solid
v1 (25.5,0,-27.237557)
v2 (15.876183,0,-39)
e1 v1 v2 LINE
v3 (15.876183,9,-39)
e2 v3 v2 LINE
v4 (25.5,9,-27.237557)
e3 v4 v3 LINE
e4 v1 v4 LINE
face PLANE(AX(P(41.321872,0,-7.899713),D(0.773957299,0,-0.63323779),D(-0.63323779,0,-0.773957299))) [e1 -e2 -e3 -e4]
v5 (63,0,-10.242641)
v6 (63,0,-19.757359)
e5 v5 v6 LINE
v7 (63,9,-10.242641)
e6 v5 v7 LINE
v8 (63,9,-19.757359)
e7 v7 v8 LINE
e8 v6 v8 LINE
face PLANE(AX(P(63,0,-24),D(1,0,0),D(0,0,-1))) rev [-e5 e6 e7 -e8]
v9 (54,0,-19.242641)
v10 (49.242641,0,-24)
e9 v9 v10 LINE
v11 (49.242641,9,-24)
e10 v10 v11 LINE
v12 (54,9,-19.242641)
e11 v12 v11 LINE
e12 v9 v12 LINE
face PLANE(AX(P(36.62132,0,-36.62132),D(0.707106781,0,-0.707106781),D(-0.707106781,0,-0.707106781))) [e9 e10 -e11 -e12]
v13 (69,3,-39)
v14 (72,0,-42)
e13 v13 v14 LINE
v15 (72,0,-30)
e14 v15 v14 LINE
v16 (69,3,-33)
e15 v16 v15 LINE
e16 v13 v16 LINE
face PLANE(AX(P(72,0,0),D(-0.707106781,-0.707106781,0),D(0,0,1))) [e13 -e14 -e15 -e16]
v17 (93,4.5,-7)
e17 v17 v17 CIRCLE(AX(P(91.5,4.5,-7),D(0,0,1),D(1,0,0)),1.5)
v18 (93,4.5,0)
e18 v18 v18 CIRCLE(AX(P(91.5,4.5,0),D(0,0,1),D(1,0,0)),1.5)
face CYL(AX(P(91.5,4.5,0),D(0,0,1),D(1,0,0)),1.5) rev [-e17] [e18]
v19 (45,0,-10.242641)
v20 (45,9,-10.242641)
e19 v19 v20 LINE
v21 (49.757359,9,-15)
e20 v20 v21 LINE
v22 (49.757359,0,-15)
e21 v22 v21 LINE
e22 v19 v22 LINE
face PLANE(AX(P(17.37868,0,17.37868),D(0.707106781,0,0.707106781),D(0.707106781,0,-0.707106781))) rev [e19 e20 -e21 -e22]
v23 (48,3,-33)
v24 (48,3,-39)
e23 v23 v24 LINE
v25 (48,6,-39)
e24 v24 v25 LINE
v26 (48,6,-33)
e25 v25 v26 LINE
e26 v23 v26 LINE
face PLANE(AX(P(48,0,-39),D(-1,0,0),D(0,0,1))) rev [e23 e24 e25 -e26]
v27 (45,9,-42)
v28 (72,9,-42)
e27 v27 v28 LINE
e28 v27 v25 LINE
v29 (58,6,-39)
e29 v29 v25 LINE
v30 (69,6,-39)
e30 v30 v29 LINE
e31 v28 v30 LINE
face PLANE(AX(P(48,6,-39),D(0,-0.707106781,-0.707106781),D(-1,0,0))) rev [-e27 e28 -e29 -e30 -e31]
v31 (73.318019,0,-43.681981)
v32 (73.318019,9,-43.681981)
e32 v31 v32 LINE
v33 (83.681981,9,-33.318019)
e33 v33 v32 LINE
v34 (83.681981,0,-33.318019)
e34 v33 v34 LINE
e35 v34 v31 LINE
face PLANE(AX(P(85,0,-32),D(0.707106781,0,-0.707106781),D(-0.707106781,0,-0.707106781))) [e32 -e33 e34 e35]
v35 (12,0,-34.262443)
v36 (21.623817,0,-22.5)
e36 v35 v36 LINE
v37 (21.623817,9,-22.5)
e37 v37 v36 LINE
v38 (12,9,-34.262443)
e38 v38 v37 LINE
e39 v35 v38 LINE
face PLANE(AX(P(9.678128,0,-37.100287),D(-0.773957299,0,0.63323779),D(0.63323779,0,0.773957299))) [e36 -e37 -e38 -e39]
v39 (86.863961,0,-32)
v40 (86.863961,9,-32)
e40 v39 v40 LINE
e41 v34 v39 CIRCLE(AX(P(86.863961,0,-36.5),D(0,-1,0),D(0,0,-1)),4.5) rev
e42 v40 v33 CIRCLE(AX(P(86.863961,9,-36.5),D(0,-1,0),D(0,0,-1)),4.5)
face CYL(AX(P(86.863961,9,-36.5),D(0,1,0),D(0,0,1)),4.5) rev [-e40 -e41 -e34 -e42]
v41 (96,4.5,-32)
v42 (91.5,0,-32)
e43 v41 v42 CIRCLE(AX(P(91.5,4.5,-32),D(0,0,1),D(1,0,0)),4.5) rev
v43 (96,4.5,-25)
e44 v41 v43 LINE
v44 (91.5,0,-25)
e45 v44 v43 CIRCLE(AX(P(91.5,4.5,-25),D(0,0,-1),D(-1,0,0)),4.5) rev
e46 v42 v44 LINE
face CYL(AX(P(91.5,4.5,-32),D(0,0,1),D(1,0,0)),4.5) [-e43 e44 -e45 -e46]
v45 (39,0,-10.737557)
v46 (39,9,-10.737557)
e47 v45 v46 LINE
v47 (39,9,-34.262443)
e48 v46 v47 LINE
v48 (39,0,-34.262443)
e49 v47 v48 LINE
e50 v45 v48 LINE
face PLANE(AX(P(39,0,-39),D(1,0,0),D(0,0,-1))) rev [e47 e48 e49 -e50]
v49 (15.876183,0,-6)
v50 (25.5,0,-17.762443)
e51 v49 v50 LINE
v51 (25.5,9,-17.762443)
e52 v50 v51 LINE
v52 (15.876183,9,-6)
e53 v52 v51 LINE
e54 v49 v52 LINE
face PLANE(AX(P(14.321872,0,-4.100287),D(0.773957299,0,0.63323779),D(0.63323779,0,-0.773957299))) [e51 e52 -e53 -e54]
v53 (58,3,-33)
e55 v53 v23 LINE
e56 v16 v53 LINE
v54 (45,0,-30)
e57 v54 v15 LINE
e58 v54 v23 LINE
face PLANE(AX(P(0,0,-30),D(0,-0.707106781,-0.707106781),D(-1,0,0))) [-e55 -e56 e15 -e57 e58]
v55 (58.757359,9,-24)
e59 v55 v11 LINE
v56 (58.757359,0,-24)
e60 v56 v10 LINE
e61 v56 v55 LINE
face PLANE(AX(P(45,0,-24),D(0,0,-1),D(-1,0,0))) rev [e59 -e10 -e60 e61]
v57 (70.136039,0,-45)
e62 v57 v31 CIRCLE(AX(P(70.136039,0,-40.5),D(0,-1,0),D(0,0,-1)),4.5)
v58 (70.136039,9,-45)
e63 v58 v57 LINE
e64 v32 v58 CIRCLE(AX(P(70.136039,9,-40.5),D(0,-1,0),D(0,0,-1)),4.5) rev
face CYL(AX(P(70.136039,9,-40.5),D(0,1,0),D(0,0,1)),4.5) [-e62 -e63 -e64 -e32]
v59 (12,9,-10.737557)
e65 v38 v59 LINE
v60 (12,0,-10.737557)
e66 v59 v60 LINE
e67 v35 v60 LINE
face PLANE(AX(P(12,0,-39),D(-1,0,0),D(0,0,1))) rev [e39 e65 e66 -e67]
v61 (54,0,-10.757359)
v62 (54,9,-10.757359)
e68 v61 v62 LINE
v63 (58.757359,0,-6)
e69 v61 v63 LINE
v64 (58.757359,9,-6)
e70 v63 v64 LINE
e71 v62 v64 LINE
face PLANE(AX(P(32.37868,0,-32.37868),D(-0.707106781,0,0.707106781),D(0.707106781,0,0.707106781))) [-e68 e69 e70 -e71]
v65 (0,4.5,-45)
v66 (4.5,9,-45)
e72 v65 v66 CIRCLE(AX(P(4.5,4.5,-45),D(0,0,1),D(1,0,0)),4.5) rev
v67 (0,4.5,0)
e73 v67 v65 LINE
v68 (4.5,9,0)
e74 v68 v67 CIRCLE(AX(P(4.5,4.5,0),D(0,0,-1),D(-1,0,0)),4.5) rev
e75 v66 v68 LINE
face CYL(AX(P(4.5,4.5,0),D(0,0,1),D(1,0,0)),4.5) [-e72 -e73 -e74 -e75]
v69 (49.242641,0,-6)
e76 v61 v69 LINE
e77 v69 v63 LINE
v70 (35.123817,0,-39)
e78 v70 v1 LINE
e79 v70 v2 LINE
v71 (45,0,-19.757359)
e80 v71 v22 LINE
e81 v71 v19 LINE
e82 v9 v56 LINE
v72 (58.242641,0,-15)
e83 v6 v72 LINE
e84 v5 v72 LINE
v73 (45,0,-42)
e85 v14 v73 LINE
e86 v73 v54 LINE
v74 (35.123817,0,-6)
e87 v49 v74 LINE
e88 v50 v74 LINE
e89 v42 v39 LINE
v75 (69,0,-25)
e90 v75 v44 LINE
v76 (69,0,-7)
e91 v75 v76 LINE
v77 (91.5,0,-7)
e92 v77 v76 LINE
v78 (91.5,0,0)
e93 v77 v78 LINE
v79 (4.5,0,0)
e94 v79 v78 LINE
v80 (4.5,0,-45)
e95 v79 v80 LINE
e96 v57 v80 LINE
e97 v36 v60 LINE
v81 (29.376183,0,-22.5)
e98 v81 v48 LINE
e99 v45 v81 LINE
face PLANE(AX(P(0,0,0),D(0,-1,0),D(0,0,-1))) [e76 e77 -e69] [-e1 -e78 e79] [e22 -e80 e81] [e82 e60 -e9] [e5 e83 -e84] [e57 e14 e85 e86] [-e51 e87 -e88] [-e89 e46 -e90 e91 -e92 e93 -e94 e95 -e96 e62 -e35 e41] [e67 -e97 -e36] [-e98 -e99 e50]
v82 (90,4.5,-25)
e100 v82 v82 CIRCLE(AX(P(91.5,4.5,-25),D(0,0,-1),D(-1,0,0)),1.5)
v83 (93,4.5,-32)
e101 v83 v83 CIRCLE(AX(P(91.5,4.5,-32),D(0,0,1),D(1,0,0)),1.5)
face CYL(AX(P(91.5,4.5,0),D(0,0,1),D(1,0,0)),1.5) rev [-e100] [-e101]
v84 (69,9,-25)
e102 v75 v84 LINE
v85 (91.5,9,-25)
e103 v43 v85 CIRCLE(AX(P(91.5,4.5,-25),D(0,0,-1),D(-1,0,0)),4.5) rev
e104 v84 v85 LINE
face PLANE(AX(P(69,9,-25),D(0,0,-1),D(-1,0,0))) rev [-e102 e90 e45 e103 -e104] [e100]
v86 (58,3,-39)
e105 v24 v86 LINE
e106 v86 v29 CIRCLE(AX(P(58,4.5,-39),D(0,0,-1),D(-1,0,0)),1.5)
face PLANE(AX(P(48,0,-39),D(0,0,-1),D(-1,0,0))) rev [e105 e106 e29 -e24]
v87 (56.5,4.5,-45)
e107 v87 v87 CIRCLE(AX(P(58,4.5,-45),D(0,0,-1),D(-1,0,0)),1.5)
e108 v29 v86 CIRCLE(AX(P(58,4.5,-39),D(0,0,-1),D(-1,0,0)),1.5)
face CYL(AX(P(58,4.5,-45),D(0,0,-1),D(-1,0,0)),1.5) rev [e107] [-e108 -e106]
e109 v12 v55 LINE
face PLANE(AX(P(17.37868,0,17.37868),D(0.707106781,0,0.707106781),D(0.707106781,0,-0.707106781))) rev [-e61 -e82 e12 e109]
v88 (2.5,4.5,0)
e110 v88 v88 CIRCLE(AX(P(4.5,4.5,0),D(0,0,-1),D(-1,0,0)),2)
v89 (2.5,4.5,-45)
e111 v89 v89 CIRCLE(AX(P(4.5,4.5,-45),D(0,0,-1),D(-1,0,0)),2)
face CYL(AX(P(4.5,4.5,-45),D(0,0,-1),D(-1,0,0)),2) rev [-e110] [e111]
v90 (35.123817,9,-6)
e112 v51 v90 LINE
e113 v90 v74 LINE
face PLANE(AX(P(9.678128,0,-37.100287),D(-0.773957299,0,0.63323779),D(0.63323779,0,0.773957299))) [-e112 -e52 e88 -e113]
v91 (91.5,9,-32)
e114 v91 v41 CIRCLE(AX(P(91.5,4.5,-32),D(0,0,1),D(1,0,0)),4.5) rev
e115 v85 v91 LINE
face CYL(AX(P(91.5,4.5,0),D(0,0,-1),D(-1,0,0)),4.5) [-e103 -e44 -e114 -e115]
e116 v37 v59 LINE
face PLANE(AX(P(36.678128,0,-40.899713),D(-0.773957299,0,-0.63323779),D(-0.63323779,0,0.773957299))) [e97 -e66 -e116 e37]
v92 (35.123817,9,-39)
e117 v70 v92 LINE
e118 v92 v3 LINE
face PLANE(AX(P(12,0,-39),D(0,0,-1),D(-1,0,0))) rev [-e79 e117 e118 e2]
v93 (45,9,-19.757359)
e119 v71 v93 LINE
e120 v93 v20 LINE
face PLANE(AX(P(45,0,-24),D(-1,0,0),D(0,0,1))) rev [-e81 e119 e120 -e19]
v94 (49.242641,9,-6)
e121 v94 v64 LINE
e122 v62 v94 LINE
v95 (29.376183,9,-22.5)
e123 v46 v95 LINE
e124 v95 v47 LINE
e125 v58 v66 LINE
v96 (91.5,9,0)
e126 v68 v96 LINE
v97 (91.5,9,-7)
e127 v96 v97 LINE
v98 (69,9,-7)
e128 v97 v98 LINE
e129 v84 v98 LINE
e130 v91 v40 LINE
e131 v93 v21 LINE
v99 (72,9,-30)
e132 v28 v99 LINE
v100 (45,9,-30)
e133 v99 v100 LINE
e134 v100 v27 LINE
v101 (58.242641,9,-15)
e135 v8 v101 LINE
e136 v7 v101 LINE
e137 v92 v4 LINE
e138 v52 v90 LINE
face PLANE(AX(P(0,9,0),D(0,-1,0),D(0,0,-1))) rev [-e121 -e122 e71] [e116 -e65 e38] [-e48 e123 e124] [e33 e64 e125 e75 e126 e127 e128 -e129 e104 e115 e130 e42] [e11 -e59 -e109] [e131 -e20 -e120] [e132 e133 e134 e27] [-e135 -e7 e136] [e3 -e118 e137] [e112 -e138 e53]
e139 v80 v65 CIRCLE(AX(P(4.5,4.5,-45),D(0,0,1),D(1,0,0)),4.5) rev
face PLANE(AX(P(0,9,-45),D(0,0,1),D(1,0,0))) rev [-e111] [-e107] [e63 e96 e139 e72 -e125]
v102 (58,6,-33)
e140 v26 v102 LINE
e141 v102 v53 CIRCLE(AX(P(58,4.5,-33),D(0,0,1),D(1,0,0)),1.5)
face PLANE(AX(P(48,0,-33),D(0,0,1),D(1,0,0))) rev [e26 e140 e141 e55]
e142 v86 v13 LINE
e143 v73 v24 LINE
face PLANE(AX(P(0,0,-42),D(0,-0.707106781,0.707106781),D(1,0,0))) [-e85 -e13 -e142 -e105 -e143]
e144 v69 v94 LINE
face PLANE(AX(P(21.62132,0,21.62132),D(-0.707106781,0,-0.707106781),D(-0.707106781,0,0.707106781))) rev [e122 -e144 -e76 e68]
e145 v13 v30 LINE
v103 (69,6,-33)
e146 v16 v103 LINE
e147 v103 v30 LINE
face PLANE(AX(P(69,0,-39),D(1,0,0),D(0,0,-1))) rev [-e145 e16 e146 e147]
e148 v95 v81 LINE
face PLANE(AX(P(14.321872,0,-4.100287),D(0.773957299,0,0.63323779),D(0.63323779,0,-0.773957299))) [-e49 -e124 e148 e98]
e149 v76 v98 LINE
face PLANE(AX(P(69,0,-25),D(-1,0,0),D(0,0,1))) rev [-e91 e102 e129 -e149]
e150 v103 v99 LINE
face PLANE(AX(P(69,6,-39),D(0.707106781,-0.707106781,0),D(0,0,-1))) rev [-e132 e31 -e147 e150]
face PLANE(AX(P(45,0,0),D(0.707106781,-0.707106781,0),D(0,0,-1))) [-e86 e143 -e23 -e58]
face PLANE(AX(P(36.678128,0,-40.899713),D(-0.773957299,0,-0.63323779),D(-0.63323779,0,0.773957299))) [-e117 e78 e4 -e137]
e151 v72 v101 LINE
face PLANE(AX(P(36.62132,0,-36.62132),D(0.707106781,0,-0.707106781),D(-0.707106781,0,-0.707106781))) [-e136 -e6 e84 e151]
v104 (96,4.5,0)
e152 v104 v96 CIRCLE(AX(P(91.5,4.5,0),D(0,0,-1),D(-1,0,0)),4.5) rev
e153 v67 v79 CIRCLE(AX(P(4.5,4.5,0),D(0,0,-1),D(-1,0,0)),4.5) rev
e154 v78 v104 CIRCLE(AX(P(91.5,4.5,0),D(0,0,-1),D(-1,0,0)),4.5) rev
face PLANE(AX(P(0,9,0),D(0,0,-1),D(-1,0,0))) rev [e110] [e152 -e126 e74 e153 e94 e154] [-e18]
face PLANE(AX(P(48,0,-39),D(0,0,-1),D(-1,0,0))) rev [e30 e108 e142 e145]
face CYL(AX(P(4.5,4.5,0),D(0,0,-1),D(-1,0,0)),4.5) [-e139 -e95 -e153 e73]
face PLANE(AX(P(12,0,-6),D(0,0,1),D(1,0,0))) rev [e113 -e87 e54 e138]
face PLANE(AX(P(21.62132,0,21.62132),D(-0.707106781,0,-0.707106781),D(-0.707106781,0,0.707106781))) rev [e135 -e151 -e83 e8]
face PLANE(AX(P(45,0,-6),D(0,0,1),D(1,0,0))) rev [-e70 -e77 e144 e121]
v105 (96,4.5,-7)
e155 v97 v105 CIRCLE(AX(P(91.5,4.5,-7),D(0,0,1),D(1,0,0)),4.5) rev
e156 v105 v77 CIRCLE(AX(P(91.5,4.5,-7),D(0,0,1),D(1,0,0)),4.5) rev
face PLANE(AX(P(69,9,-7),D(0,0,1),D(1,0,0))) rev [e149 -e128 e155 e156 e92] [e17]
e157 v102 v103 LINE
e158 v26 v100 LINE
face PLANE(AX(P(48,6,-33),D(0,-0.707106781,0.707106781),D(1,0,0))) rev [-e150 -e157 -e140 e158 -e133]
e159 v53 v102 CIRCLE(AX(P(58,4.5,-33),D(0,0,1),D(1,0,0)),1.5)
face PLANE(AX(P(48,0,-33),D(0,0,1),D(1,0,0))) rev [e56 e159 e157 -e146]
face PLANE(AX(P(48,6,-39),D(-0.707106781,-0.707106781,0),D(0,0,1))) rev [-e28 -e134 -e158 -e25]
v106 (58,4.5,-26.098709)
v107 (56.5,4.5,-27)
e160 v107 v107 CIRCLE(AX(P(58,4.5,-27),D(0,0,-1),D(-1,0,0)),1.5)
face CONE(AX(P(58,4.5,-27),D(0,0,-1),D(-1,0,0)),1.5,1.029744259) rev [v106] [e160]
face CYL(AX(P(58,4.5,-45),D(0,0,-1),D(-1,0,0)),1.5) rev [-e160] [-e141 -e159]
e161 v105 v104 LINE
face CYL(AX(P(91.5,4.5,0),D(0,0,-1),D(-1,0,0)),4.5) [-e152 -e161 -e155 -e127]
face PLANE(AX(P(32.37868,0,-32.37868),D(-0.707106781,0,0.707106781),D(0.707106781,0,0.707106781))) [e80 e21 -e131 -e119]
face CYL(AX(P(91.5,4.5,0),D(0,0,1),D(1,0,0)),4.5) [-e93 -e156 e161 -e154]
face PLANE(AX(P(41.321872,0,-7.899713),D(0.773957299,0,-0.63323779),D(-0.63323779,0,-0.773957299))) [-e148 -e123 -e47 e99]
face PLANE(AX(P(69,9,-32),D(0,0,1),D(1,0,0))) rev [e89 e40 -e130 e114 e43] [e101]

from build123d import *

# Parameters (mm, degrees)
SKETCH1_W                 = 72
SKETCH1_H                 = 45
BOSS_EXTRUDE1_DEPTH       = 9
SKETCH3_W                 = 27
SKETCH3_H                 = 7
BOSS_EXTRUDE3_DEPTH       = 9
SKETCH4_W                 = 27
SKETCH4_H                 = 7
BOSS_EXTRUDE4_DEPTH       = 9
SKETCH5_W                 = 3
SKETCH5_H                 = 18
CUT_EXTRUDE1_DEPTH        = 9
BOSS_EXTRUDE5_DEPTH       = 9
FILLET1_R                 = 4.5
F_4_0MM_DOWEL_HOLE1_D     = 4
F_3_0MM_DOWEL_HOLE1_D     = 3
SKETCH12_W                = 21
SKETCH12_H                = 6
CUT_EXTRUDE3_DEPTH        = 9
CHAMFER1_SIZE             = 3
F_3_0MM_DOWEL_HOLE2_D     = 3
F_3_0MM_DOWEL_HOLE2_DEPTH = 18
F_3_0MM_DOWEL_HOLE2_TIP   = 0.901290929
SKETCH16_W                = 27
SKETCH16_H                = 33
SKETCH16_W_2              = 18
SKETCH16_H_2              = 18
CUT_EXTRUDE4_DEPTH        = 9
BOSS_EXTRUDE7_DEPTH       = 9
BOSS_EXTRUDE8_DEPTH       = 9
BOSS_EXTRUDE10_DEPTH      = 9


with BuildPart() as part:
    # Sketch1 → Boss-Extrude1 (new body)
    with BuildSketch(Plane(origin=(0, 0, 0), x_dir=(1, 0, 0), z_dir=(0, 1, 0))):
        with Locations((36, 22.5)):
            Rectangle(SKETCH1_W, SKETCH1_H)
    extrude(amount=BOSS_EXTRUDE1_DEPTH)

    # Sketch3 → Boss-Extrude3 (add)
    with BuildSketch(Plane(origin=(0, 0, 0), x_dir=(1, 0, 0), z_dir=(0, 1, 0))):
        with Locations((82.5, 28.5)):
            Rectangle(SKETCH3_W, SKETCH3_H)
    extrude(amount=BOSS_EXTRUDE3_DEPTH)

    # Sketch4 → Boss-Extrude4 (add)
    with BuildSketch(Plane(origin=(0, 0, 0), x_dir=(1, 0, 0), z_dir=(0, 1, 0))):
        with Locations((82.5, 3.5)):
            Rectangle(SKETCH4_W, SKETCH4_H)
    extrude(amount=BOSS_EXTRUDE4_DEPTH)

    # Sketch5 → Cut-Extrude1 (cut)
    with BuildSketch(Plane(origin=(0, 9, 0), x_dir=(1, 0, 0), z_dir=(0, 1, 0))):
        with Locations((70.5, 16)):
            Rectangle(SKETCH5_W, SKETCH5_H)
    extrude(amount=-CUT_EXTRUDE1_DEPTH, mode=Mode.SUBTRACT)

    # Sketch6 → Boss-Extrude5 (add)
    with BuildSketch(Plane(origin=(0, 9, 0), x_dir=(1, 0, 0), z_dir=(0, 1, 0))):
        Polygon((72, 45), (72, 32), (85, 32), align=None)
    extrude(amount=-BOSS_EXTRUDE5_DEPTH)

    # Fillet1
    fillet1_edges = [part.edges().sort_by_distance(p)[0] for p in [
        (0, 0, -22.5),
        (0, 9, -22.5),
        (72, 4.5, -45),
        (85, 4.5, -32),
        (96, 0, -3.5),
        (96, 9, -3.5),
        (96, 0, -28.5),
        (96, 9, -28.5),
    ]]
    fillet(fillet1_edges, radius=FILLET1_R - 0.0001)  # a hair under: the kernel refuses the full size

    # Ø4.0mm Dowel Hole1 (through all)
    with Locations(Plane(origin=(0, 0, -45), x_dir=(-1, 0, 0), z_dir=(0, 0, -1))):
        with Locations((-4.5, 4.5)):
            Hole(F_4_0MM_DOWEL_HOLE1_D / 2)

    # Ø3.0mm Dowel Hole1 (through all)
    with Locations(Plane.XY):
        with Locations((91.5, 4.5)):
            Hole(F_3_0MM_DOWEL_HOLE1_D / 2)

    # Sketch12 → Cut-Extrude3 (cut)
    with BuildSketch(Plane(origin=(0, 9, 0), x_dir=(1, 0, 0), z_dir=(0, 1, 0))):
        with Locations((58.5, 36)):
            Rectangle(SKETCH12_W, SKETCH12_H)
    extrude(amount=-CUT_EXTRUDE3_DEPTH, mode=Mode.SUBTRACT)

    # Chamfer1
    chamfer1_edges = [part.edges().sort_by_distance(p)[0] for p in [
        (48, 0, -36),
        (58.5, 0, -39),
        (69, 0, -36),
        (58.5, 0, -33),
        (48, 9, -36),
        (58.5, 9, -33),
        (69, 9, -36),
        (58.5, 9, -39),
    ]]
    chamfer(chamfer1_edges, length=CHAMFER1_SIZE)

    # Ø3.0mm Dowel Hole2
    with Locations(Plane(origin=(0, 0, -45), x_dir=(-1, 0, 0), z_dir=(0, 0, -1))):
        with Locations((-58, 4.5)):
            Hole(F_3_0MM_DOWEL_HOLE2_D / 2, depth=F_3_0MM_DOWEL_HOLE2_DEPTH)
            with Locations((0, 0, -(F_3_0MM_DOWEL_HOLE2_DEPTH + F_3_0MM_DOWEL_HOLE2_TIP / 2))):  # 118° drill point
                Cone(0, F_3_0MM_DOWEL_HOLE2_D / 2, F_3_0MM_DOWEL_HOLE2_TIP, mode=Mode.SUBTRACT)

    # Sketch16 → Cut-Extrude4 (cut)
    with BuildSketch(Plane(origin=(0, 9, 0), x_dir=(1, 0, 0), z_dir=(0, 1, 0))):
        with Locations((25.5, 22.5)):
            Rectangle(SKETCH16_W, SKETCH16_H)
        with Locations((54, 15)):
            Rectangle(SKETCH16_W_2, SKETCH16_H_2)
    extrude(amount=-CUT_EXTRUDE4_DEPTH, mode=Mode.SUBTRACT)

    # Sketch17 → Boss-Extrude7 (add)
    with BuildSketch(Plane(origin=(0, 9, 0), x_dir=(1, 0, 0), z_dir=(0, 1, 0))):
        Polygon((39, 6), (41.321871898, 7.899713371), (14.321871898, 40.899713371), (12, 39), (9.678128102, 37.100286629), (36.678128102, 4.100286629), align=None)
    extrude(amount=-BOSS_EXTRUDE7_DEPTH)

    # Sketch18 → Boss-Extrude8 (add)
    with BuildSketch(Plane(origin=(0, 9, 0), x_dir=(1, 0, 0), z_dir=(0, 1, 0))):
        Polygon((12, 6), (14.321871898, 4.100286629), (41.321871898, 37.100286629), (39, 39), (36.678128102, 40.899713371), (9.678128102, 7.899713371), align=None)
    extrude(amount=-BOSS_EXTRUDE8_DEPTH)

    # Sketch19 → Boss-Extrude10 (add)
    with BuildSketch(Plane(origin=(0, 9, 0), x_dir=(1, 0, 0), z_dir=(0, 1, 0))):
        Polygon((58.242640687, 15), (54, 10.757359313), (58.757359313, 6), (63, 6), (63, 10.242640687), align=None)
        Polygon((45, 19.757359313), (49.757359313, 15), (54, 19.242640687), (49.242640687, 24), (45, 24), align=None)
        Polygon((54, 19.242640687), (58.242640687, 15), (63, 19.757359313), (63, 24), (58.757359313, 24), align=None)
        Polygon((45, 10.242640687), (45, 6), (49.242640687, 6), (54, 10.757359313), (49.757359313, 15), align=None)
        Polygon((49.757359313, 15), (54, 10.757359313), (58.242640687, 15), (54, 19.242640687), align=None)
    extrude(amount=-BOSS_EXTRUDE10_DEPTH)


solid = part.part
